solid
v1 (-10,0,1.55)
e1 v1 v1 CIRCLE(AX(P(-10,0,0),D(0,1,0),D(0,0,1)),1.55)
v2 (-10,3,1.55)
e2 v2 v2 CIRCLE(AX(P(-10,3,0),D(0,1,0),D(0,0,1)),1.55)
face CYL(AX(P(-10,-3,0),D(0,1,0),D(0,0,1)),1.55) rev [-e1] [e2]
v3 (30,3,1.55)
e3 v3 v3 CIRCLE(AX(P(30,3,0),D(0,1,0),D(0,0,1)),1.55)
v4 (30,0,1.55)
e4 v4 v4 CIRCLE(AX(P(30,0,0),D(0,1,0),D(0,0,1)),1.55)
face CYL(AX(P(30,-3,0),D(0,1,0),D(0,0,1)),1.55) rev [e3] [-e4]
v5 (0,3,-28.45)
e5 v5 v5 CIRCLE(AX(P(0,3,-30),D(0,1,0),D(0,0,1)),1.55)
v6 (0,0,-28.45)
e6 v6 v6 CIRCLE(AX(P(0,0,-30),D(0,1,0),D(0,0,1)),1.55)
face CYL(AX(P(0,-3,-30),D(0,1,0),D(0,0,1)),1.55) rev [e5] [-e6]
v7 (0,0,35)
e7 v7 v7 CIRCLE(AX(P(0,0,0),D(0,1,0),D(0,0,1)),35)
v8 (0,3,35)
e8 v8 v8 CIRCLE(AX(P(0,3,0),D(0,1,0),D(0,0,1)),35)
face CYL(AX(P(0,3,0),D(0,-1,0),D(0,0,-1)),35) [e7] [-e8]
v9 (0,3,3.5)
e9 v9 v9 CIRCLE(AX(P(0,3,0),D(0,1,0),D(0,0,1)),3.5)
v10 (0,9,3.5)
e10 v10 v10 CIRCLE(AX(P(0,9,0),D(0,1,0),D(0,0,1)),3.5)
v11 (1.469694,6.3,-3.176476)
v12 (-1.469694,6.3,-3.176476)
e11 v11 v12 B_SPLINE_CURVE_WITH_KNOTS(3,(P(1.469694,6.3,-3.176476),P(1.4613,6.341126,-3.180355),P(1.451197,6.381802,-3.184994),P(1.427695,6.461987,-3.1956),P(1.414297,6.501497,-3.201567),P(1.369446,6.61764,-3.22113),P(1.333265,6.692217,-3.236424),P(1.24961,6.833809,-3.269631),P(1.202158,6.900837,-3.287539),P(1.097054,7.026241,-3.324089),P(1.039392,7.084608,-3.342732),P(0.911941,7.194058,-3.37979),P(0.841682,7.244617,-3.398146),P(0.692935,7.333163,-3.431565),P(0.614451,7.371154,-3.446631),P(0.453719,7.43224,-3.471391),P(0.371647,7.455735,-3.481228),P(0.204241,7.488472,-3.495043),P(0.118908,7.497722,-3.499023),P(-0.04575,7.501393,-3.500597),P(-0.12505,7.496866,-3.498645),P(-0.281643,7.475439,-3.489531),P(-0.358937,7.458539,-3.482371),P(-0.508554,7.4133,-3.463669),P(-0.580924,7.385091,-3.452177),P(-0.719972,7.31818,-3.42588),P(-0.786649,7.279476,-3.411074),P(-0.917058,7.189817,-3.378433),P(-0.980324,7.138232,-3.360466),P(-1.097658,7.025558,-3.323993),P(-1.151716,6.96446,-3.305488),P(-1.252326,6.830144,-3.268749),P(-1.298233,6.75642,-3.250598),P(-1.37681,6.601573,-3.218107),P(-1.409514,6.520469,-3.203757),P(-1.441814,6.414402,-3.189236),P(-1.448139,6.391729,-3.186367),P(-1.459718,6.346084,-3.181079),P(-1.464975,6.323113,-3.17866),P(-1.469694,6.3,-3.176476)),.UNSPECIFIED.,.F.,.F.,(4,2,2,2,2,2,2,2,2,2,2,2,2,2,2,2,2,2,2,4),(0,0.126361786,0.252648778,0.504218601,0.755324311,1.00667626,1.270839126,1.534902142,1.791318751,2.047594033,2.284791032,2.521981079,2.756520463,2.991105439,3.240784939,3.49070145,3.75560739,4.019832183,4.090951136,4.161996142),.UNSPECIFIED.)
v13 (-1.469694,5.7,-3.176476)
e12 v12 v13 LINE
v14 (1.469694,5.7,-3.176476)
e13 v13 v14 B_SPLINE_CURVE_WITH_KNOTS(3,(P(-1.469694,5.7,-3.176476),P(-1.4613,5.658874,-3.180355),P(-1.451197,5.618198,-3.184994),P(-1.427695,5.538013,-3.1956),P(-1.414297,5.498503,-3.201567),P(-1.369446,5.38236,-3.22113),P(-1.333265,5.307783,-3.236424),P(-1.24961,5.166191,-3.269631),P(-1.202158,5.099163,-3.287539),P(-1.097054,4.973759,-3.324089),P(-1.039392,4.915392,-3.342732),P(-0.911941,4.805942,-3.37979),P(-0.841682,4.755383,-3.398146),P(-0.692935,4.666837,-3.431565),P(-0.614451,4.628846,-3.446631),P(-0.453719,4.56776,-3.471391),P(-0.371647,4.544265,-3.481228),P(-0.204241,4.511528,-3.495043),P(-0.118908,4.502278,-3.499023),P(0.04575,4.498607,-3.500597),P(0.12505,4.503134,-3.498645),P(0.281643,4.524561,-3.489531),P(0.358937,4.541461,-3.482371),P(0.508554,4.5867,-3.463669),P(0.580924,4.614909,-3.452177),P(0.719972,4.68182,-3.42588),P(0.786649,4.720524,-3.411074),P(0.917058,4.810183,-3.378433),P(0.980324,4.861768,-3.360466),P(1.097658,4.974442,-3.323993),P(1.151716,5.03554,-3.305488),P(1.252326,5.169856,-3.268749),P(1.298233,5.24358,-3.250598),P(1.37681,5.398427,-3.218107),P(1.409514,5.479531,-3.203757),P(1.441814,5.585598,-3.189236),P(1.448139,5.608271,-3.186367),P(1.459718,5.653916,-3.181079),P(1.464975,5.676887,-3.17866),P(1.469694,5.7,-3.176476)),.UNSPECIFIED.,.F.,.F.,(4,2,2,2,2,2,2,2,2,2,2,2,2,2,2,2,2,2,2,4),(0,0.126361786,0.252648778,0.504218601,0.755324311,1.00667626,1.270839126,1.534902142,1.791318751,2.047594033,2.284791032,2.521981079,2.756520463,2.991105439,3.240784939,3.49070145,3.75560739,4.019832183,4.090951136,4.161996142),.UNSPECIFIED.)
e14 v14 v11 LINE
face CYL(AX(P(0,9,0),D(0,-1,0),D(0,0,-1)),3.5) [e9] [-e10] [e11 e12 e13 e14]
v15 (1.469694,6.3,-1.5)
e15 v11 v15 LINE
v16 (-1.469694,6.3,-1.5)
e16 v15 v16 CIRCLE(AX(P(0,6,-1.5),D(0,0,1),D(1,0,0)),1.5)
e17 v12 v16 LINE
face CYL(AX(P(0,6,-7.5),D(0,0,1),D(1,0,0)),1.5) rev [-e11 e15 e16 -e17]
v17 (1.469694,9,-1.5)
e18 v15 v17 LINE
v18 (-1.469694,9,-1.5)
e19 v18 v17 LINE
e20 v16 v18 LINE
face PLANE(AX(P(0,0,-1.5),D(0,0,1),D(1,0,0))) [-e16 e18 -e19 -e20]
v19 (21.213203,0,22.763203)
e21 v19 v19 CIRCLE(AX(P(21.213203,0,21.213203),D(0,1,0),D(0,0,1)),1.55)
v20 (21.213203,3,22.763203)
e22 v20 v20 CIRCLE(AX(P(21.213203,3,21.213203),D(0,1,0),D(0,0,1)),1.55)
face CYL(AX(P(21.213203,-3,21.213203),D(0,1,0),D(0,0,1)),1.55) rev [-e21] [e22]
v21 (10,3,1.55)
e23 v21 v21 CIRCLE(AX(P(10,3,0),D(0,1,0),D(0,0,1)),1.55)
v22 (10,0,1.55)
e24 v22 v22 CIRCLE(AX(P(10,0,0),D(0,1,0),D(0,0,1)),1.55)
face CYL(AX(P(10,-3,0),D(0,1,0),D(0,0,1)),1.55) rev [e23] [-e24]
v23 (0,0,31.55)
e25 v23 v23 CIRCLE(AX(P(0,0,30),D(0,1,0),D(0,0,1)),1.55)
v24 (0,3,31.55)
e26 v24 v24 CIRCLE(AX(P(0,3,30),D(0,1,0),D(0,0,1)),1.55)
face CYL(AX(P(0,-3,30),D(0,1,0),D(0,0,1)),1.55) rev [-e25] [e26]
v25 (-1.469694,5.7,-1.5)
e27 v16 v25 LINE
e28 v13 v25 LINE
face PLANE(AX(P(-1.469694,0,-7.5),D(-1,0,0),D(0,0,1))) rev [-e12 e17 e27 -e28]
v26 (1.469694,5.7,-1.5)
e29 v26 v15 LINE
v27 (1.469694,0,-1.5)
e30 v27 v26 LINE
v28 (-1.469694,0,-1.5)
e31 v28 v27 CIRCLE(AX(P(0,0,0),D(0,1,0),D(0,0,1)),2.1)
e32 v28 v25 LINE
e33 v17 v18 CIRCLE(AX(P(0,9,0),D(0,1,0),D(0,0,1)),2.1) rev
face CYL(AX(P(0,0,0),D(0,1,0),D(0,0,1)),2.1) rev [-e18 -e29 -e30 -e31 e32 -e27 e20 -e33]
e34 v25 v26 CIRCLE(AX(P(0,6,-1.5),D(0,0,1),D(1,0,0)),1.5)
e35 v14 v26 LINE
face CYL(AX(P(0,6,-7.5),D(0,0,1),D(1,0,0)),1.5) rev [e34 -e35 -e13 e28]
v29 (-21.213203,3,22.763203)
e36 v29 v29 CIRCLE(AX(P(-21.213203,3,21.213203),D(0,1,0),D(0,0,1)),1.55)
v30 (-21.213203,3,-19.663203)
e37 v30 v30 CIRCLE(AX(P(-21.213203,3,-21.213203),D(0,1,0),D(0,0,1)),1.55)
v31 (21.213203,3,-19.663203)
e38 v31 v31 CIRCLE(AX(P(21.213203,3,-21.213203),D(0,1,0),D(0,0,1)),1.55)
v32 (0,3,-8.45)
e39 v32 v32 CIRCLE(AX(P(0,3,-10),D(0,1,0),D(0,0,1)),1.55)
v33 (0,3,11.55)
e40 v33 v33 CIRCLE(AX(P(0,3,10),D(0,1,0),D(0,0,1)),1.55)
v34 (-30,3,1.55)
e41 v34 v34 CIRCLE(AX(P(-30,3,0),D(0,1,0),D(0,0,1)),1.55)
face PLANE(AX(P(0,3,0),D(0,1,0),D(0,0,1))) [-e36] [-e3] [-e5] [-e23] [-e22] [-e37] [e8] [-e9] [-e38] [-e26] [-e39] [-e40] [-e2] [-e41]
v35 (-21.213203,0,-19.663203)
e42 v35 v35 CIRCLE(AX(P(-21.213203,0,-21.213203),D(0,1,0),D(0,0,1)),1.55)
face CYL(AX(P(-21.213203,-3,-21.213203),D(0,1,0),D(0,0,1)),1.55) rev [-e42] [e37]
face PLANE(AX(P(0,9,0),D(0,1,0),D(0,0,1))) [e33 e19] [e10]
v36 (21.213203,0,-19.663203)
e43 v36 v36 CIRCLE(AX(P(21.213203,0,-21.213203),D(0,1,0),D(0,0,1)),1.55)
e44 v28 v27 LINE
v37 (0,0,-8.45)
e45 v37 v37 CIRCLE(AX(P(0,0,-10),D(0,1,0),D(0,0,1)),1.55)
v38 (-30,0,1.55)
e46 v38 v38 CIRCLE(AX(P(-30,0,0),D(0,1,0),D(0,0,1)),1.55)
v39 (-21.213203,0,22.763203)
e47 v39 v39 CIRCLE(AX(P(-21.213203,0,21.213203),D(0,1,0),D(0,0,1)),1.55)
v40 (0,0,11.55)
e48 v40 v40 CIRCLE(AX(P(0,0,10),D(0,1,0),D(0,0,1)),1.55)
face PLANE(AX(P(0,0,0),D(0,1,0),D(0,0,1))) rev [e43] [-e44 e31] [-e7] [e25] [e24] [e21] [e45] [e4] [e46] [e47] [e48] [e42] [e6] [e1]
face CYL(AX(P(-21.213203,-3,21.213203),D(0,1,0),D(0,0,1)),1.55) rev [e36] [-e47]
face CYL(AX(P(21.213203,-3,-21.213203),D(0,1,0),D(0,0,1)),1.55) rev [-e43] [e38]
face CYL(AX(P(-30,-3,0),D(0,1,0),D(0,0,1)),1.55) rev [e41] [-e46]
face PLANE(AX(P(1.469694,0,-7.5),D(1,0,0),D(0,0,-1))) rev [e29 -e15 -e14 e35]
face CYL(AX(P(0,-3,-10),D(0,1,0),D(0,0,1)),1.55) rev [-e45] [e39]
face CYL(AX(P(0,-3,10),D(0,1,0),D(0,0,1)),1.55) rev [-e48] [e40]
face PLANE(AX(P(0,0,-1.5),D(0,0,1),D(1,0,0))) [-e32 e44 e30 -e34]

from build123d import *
from build123d.topology import SkipClean

# Parameters (mm, degrees)
SKETCH_1_R          = 35
EXTRUDE_1_DEPTH     = 3
CUT_EXTRUDE_1_DEPTH = 3
EXTRUDE_START       = 6
SKETCH_3_R          = 3.5
EXTRUDE_2_DEPTH     = 6
CUT_EXTRUDE_2_DEPTH = 6
SKETCH_5_R          = 1.55
CUT_EXTRUDE_3_DEPTH = 6


with BuildPart() as part:
    # 草图1 → 凸台-拉伸1 (new body)
    with BuildSketch(Plane(origin=(0, 0, 0), x_dir=(1, 0, 0), z_dir=(0, 1, 0))):
        Circle(SKETCH_1_R)
    extrude(amount=EXTRUDE_1_DEPTH)

    # 草图2 → 切除-拉伸1 (cut)
    with BuildSketch(Plane(origin=(0, 3, 0), x_dir=(1, 0, 0), z_dir=(0, 1, 0))):
        with BuildLine():
            Line((0, 1.5), (-1.469693846, 1.5))
            ThreePointArc((-1.469693846, 1.5), (-0.8135241, -1.936021317), (2.1, 0))
            ThreePointArc((2.1, 0), (1.936021317, 0.8135241), (1.469693846, 1.5))
            Line((1.469693846, 1.5), (0, 1.5))
        make_face()
    extrude(amount=-CUT_EXTRUDE_1_DEPTH, mode=Mode.SUBTRACT)

    # 草图3 → 凸台-拉伸2 (add)
    with BuildSketch(Plane(origin=(0, 3, 0), x_dir=(1, 0, 0), z_dir=(0, 1, 0)).offset(EXTRUDE_START)):
        Circle(SKETCH_3_R)
        with BuildLine():
            ThreePointArc((1.469693846, 1.5), (0, -2.1), (-1.469693846, 1.5))
            Line((-1.469693846, 1.5), (1.469693846, 1.5))
        make_face(mode=Mode.SUBTRACT)
    extrude(amount=-EXTRUDE_2_DEPTH)

    # 草图4 → 切除-拉伸2 (cut)
    with BuildSketch(Plane.XY.offset(-1.5)):
        with BuildLine():
            Line((1.469693846, 5.7), (1.469693846, 6.3))
            ThreePointArc((1.469693846, 6.3), (0.948683298, 7.161895004), (0, 7.5))
            ThreePointArc((0, 7.5), (-0.948683298, 7.161895004), (-1.469693846, 6.3))
            Line((-1.469693846, 6.3), (-1.469693846, 5.7))
            ThreePointArc((-1.469693846, 5.7), (0, 4.5), (1.469693846, 5.7))
        make_face()
    extrude(amount=-CUT_EXTRUDE_2_DEPTH, mode=Mode.SUBTRACT)

    # 草图5 → 切除-拉伸3 (cut)
    with SkipClean():  # the faces are left unmerged after this step: merging them gives an invalid solid
        with BuildSketch(Plane(origin=(0, 3, 0), x_dir=(1, 0, 0), z_dir=(0, 1, 0))):
            with Locations((0, 30)):
                Circle(SKETCH_5_R)
            with Locations((0, 10)):
                Circle(SKETCH_5_R)
            with Locations((30, 0)):
                Circle(SKETCH_5_R)
            with Locations((10, 0)):
                Circle(SKETCH_5_R)
            with Locations((0, -30)):
                Circle(SKETCH_5_R)
            with Locations((0, -10)):
                Circle(SKETCH_5_R)
            with Locations((-10, 0)):
                Circle(SKETCH_5_R)
            with Locations((-30, 0)):
                Circle(SKETCH_5_R)
            with Locations((21.213203436, 21.213203436)):
                Circle(SKETCH_5_R)
            with Locations((21.213203436, -21.213203436)):
                Circle(SKETCH_5_R)
            with Locations((-21.213203436, -21.213203436)):
                Circle(SKETCH_5_R)
            with Locations((-21.213203436, 21.213203436)):
                Circle(SKETCH_5_R)
        extrude(amount=-CUT_EXTRUDE_3_DEPTH, mode=Mode.SUBTRACT)


solid = part.part
